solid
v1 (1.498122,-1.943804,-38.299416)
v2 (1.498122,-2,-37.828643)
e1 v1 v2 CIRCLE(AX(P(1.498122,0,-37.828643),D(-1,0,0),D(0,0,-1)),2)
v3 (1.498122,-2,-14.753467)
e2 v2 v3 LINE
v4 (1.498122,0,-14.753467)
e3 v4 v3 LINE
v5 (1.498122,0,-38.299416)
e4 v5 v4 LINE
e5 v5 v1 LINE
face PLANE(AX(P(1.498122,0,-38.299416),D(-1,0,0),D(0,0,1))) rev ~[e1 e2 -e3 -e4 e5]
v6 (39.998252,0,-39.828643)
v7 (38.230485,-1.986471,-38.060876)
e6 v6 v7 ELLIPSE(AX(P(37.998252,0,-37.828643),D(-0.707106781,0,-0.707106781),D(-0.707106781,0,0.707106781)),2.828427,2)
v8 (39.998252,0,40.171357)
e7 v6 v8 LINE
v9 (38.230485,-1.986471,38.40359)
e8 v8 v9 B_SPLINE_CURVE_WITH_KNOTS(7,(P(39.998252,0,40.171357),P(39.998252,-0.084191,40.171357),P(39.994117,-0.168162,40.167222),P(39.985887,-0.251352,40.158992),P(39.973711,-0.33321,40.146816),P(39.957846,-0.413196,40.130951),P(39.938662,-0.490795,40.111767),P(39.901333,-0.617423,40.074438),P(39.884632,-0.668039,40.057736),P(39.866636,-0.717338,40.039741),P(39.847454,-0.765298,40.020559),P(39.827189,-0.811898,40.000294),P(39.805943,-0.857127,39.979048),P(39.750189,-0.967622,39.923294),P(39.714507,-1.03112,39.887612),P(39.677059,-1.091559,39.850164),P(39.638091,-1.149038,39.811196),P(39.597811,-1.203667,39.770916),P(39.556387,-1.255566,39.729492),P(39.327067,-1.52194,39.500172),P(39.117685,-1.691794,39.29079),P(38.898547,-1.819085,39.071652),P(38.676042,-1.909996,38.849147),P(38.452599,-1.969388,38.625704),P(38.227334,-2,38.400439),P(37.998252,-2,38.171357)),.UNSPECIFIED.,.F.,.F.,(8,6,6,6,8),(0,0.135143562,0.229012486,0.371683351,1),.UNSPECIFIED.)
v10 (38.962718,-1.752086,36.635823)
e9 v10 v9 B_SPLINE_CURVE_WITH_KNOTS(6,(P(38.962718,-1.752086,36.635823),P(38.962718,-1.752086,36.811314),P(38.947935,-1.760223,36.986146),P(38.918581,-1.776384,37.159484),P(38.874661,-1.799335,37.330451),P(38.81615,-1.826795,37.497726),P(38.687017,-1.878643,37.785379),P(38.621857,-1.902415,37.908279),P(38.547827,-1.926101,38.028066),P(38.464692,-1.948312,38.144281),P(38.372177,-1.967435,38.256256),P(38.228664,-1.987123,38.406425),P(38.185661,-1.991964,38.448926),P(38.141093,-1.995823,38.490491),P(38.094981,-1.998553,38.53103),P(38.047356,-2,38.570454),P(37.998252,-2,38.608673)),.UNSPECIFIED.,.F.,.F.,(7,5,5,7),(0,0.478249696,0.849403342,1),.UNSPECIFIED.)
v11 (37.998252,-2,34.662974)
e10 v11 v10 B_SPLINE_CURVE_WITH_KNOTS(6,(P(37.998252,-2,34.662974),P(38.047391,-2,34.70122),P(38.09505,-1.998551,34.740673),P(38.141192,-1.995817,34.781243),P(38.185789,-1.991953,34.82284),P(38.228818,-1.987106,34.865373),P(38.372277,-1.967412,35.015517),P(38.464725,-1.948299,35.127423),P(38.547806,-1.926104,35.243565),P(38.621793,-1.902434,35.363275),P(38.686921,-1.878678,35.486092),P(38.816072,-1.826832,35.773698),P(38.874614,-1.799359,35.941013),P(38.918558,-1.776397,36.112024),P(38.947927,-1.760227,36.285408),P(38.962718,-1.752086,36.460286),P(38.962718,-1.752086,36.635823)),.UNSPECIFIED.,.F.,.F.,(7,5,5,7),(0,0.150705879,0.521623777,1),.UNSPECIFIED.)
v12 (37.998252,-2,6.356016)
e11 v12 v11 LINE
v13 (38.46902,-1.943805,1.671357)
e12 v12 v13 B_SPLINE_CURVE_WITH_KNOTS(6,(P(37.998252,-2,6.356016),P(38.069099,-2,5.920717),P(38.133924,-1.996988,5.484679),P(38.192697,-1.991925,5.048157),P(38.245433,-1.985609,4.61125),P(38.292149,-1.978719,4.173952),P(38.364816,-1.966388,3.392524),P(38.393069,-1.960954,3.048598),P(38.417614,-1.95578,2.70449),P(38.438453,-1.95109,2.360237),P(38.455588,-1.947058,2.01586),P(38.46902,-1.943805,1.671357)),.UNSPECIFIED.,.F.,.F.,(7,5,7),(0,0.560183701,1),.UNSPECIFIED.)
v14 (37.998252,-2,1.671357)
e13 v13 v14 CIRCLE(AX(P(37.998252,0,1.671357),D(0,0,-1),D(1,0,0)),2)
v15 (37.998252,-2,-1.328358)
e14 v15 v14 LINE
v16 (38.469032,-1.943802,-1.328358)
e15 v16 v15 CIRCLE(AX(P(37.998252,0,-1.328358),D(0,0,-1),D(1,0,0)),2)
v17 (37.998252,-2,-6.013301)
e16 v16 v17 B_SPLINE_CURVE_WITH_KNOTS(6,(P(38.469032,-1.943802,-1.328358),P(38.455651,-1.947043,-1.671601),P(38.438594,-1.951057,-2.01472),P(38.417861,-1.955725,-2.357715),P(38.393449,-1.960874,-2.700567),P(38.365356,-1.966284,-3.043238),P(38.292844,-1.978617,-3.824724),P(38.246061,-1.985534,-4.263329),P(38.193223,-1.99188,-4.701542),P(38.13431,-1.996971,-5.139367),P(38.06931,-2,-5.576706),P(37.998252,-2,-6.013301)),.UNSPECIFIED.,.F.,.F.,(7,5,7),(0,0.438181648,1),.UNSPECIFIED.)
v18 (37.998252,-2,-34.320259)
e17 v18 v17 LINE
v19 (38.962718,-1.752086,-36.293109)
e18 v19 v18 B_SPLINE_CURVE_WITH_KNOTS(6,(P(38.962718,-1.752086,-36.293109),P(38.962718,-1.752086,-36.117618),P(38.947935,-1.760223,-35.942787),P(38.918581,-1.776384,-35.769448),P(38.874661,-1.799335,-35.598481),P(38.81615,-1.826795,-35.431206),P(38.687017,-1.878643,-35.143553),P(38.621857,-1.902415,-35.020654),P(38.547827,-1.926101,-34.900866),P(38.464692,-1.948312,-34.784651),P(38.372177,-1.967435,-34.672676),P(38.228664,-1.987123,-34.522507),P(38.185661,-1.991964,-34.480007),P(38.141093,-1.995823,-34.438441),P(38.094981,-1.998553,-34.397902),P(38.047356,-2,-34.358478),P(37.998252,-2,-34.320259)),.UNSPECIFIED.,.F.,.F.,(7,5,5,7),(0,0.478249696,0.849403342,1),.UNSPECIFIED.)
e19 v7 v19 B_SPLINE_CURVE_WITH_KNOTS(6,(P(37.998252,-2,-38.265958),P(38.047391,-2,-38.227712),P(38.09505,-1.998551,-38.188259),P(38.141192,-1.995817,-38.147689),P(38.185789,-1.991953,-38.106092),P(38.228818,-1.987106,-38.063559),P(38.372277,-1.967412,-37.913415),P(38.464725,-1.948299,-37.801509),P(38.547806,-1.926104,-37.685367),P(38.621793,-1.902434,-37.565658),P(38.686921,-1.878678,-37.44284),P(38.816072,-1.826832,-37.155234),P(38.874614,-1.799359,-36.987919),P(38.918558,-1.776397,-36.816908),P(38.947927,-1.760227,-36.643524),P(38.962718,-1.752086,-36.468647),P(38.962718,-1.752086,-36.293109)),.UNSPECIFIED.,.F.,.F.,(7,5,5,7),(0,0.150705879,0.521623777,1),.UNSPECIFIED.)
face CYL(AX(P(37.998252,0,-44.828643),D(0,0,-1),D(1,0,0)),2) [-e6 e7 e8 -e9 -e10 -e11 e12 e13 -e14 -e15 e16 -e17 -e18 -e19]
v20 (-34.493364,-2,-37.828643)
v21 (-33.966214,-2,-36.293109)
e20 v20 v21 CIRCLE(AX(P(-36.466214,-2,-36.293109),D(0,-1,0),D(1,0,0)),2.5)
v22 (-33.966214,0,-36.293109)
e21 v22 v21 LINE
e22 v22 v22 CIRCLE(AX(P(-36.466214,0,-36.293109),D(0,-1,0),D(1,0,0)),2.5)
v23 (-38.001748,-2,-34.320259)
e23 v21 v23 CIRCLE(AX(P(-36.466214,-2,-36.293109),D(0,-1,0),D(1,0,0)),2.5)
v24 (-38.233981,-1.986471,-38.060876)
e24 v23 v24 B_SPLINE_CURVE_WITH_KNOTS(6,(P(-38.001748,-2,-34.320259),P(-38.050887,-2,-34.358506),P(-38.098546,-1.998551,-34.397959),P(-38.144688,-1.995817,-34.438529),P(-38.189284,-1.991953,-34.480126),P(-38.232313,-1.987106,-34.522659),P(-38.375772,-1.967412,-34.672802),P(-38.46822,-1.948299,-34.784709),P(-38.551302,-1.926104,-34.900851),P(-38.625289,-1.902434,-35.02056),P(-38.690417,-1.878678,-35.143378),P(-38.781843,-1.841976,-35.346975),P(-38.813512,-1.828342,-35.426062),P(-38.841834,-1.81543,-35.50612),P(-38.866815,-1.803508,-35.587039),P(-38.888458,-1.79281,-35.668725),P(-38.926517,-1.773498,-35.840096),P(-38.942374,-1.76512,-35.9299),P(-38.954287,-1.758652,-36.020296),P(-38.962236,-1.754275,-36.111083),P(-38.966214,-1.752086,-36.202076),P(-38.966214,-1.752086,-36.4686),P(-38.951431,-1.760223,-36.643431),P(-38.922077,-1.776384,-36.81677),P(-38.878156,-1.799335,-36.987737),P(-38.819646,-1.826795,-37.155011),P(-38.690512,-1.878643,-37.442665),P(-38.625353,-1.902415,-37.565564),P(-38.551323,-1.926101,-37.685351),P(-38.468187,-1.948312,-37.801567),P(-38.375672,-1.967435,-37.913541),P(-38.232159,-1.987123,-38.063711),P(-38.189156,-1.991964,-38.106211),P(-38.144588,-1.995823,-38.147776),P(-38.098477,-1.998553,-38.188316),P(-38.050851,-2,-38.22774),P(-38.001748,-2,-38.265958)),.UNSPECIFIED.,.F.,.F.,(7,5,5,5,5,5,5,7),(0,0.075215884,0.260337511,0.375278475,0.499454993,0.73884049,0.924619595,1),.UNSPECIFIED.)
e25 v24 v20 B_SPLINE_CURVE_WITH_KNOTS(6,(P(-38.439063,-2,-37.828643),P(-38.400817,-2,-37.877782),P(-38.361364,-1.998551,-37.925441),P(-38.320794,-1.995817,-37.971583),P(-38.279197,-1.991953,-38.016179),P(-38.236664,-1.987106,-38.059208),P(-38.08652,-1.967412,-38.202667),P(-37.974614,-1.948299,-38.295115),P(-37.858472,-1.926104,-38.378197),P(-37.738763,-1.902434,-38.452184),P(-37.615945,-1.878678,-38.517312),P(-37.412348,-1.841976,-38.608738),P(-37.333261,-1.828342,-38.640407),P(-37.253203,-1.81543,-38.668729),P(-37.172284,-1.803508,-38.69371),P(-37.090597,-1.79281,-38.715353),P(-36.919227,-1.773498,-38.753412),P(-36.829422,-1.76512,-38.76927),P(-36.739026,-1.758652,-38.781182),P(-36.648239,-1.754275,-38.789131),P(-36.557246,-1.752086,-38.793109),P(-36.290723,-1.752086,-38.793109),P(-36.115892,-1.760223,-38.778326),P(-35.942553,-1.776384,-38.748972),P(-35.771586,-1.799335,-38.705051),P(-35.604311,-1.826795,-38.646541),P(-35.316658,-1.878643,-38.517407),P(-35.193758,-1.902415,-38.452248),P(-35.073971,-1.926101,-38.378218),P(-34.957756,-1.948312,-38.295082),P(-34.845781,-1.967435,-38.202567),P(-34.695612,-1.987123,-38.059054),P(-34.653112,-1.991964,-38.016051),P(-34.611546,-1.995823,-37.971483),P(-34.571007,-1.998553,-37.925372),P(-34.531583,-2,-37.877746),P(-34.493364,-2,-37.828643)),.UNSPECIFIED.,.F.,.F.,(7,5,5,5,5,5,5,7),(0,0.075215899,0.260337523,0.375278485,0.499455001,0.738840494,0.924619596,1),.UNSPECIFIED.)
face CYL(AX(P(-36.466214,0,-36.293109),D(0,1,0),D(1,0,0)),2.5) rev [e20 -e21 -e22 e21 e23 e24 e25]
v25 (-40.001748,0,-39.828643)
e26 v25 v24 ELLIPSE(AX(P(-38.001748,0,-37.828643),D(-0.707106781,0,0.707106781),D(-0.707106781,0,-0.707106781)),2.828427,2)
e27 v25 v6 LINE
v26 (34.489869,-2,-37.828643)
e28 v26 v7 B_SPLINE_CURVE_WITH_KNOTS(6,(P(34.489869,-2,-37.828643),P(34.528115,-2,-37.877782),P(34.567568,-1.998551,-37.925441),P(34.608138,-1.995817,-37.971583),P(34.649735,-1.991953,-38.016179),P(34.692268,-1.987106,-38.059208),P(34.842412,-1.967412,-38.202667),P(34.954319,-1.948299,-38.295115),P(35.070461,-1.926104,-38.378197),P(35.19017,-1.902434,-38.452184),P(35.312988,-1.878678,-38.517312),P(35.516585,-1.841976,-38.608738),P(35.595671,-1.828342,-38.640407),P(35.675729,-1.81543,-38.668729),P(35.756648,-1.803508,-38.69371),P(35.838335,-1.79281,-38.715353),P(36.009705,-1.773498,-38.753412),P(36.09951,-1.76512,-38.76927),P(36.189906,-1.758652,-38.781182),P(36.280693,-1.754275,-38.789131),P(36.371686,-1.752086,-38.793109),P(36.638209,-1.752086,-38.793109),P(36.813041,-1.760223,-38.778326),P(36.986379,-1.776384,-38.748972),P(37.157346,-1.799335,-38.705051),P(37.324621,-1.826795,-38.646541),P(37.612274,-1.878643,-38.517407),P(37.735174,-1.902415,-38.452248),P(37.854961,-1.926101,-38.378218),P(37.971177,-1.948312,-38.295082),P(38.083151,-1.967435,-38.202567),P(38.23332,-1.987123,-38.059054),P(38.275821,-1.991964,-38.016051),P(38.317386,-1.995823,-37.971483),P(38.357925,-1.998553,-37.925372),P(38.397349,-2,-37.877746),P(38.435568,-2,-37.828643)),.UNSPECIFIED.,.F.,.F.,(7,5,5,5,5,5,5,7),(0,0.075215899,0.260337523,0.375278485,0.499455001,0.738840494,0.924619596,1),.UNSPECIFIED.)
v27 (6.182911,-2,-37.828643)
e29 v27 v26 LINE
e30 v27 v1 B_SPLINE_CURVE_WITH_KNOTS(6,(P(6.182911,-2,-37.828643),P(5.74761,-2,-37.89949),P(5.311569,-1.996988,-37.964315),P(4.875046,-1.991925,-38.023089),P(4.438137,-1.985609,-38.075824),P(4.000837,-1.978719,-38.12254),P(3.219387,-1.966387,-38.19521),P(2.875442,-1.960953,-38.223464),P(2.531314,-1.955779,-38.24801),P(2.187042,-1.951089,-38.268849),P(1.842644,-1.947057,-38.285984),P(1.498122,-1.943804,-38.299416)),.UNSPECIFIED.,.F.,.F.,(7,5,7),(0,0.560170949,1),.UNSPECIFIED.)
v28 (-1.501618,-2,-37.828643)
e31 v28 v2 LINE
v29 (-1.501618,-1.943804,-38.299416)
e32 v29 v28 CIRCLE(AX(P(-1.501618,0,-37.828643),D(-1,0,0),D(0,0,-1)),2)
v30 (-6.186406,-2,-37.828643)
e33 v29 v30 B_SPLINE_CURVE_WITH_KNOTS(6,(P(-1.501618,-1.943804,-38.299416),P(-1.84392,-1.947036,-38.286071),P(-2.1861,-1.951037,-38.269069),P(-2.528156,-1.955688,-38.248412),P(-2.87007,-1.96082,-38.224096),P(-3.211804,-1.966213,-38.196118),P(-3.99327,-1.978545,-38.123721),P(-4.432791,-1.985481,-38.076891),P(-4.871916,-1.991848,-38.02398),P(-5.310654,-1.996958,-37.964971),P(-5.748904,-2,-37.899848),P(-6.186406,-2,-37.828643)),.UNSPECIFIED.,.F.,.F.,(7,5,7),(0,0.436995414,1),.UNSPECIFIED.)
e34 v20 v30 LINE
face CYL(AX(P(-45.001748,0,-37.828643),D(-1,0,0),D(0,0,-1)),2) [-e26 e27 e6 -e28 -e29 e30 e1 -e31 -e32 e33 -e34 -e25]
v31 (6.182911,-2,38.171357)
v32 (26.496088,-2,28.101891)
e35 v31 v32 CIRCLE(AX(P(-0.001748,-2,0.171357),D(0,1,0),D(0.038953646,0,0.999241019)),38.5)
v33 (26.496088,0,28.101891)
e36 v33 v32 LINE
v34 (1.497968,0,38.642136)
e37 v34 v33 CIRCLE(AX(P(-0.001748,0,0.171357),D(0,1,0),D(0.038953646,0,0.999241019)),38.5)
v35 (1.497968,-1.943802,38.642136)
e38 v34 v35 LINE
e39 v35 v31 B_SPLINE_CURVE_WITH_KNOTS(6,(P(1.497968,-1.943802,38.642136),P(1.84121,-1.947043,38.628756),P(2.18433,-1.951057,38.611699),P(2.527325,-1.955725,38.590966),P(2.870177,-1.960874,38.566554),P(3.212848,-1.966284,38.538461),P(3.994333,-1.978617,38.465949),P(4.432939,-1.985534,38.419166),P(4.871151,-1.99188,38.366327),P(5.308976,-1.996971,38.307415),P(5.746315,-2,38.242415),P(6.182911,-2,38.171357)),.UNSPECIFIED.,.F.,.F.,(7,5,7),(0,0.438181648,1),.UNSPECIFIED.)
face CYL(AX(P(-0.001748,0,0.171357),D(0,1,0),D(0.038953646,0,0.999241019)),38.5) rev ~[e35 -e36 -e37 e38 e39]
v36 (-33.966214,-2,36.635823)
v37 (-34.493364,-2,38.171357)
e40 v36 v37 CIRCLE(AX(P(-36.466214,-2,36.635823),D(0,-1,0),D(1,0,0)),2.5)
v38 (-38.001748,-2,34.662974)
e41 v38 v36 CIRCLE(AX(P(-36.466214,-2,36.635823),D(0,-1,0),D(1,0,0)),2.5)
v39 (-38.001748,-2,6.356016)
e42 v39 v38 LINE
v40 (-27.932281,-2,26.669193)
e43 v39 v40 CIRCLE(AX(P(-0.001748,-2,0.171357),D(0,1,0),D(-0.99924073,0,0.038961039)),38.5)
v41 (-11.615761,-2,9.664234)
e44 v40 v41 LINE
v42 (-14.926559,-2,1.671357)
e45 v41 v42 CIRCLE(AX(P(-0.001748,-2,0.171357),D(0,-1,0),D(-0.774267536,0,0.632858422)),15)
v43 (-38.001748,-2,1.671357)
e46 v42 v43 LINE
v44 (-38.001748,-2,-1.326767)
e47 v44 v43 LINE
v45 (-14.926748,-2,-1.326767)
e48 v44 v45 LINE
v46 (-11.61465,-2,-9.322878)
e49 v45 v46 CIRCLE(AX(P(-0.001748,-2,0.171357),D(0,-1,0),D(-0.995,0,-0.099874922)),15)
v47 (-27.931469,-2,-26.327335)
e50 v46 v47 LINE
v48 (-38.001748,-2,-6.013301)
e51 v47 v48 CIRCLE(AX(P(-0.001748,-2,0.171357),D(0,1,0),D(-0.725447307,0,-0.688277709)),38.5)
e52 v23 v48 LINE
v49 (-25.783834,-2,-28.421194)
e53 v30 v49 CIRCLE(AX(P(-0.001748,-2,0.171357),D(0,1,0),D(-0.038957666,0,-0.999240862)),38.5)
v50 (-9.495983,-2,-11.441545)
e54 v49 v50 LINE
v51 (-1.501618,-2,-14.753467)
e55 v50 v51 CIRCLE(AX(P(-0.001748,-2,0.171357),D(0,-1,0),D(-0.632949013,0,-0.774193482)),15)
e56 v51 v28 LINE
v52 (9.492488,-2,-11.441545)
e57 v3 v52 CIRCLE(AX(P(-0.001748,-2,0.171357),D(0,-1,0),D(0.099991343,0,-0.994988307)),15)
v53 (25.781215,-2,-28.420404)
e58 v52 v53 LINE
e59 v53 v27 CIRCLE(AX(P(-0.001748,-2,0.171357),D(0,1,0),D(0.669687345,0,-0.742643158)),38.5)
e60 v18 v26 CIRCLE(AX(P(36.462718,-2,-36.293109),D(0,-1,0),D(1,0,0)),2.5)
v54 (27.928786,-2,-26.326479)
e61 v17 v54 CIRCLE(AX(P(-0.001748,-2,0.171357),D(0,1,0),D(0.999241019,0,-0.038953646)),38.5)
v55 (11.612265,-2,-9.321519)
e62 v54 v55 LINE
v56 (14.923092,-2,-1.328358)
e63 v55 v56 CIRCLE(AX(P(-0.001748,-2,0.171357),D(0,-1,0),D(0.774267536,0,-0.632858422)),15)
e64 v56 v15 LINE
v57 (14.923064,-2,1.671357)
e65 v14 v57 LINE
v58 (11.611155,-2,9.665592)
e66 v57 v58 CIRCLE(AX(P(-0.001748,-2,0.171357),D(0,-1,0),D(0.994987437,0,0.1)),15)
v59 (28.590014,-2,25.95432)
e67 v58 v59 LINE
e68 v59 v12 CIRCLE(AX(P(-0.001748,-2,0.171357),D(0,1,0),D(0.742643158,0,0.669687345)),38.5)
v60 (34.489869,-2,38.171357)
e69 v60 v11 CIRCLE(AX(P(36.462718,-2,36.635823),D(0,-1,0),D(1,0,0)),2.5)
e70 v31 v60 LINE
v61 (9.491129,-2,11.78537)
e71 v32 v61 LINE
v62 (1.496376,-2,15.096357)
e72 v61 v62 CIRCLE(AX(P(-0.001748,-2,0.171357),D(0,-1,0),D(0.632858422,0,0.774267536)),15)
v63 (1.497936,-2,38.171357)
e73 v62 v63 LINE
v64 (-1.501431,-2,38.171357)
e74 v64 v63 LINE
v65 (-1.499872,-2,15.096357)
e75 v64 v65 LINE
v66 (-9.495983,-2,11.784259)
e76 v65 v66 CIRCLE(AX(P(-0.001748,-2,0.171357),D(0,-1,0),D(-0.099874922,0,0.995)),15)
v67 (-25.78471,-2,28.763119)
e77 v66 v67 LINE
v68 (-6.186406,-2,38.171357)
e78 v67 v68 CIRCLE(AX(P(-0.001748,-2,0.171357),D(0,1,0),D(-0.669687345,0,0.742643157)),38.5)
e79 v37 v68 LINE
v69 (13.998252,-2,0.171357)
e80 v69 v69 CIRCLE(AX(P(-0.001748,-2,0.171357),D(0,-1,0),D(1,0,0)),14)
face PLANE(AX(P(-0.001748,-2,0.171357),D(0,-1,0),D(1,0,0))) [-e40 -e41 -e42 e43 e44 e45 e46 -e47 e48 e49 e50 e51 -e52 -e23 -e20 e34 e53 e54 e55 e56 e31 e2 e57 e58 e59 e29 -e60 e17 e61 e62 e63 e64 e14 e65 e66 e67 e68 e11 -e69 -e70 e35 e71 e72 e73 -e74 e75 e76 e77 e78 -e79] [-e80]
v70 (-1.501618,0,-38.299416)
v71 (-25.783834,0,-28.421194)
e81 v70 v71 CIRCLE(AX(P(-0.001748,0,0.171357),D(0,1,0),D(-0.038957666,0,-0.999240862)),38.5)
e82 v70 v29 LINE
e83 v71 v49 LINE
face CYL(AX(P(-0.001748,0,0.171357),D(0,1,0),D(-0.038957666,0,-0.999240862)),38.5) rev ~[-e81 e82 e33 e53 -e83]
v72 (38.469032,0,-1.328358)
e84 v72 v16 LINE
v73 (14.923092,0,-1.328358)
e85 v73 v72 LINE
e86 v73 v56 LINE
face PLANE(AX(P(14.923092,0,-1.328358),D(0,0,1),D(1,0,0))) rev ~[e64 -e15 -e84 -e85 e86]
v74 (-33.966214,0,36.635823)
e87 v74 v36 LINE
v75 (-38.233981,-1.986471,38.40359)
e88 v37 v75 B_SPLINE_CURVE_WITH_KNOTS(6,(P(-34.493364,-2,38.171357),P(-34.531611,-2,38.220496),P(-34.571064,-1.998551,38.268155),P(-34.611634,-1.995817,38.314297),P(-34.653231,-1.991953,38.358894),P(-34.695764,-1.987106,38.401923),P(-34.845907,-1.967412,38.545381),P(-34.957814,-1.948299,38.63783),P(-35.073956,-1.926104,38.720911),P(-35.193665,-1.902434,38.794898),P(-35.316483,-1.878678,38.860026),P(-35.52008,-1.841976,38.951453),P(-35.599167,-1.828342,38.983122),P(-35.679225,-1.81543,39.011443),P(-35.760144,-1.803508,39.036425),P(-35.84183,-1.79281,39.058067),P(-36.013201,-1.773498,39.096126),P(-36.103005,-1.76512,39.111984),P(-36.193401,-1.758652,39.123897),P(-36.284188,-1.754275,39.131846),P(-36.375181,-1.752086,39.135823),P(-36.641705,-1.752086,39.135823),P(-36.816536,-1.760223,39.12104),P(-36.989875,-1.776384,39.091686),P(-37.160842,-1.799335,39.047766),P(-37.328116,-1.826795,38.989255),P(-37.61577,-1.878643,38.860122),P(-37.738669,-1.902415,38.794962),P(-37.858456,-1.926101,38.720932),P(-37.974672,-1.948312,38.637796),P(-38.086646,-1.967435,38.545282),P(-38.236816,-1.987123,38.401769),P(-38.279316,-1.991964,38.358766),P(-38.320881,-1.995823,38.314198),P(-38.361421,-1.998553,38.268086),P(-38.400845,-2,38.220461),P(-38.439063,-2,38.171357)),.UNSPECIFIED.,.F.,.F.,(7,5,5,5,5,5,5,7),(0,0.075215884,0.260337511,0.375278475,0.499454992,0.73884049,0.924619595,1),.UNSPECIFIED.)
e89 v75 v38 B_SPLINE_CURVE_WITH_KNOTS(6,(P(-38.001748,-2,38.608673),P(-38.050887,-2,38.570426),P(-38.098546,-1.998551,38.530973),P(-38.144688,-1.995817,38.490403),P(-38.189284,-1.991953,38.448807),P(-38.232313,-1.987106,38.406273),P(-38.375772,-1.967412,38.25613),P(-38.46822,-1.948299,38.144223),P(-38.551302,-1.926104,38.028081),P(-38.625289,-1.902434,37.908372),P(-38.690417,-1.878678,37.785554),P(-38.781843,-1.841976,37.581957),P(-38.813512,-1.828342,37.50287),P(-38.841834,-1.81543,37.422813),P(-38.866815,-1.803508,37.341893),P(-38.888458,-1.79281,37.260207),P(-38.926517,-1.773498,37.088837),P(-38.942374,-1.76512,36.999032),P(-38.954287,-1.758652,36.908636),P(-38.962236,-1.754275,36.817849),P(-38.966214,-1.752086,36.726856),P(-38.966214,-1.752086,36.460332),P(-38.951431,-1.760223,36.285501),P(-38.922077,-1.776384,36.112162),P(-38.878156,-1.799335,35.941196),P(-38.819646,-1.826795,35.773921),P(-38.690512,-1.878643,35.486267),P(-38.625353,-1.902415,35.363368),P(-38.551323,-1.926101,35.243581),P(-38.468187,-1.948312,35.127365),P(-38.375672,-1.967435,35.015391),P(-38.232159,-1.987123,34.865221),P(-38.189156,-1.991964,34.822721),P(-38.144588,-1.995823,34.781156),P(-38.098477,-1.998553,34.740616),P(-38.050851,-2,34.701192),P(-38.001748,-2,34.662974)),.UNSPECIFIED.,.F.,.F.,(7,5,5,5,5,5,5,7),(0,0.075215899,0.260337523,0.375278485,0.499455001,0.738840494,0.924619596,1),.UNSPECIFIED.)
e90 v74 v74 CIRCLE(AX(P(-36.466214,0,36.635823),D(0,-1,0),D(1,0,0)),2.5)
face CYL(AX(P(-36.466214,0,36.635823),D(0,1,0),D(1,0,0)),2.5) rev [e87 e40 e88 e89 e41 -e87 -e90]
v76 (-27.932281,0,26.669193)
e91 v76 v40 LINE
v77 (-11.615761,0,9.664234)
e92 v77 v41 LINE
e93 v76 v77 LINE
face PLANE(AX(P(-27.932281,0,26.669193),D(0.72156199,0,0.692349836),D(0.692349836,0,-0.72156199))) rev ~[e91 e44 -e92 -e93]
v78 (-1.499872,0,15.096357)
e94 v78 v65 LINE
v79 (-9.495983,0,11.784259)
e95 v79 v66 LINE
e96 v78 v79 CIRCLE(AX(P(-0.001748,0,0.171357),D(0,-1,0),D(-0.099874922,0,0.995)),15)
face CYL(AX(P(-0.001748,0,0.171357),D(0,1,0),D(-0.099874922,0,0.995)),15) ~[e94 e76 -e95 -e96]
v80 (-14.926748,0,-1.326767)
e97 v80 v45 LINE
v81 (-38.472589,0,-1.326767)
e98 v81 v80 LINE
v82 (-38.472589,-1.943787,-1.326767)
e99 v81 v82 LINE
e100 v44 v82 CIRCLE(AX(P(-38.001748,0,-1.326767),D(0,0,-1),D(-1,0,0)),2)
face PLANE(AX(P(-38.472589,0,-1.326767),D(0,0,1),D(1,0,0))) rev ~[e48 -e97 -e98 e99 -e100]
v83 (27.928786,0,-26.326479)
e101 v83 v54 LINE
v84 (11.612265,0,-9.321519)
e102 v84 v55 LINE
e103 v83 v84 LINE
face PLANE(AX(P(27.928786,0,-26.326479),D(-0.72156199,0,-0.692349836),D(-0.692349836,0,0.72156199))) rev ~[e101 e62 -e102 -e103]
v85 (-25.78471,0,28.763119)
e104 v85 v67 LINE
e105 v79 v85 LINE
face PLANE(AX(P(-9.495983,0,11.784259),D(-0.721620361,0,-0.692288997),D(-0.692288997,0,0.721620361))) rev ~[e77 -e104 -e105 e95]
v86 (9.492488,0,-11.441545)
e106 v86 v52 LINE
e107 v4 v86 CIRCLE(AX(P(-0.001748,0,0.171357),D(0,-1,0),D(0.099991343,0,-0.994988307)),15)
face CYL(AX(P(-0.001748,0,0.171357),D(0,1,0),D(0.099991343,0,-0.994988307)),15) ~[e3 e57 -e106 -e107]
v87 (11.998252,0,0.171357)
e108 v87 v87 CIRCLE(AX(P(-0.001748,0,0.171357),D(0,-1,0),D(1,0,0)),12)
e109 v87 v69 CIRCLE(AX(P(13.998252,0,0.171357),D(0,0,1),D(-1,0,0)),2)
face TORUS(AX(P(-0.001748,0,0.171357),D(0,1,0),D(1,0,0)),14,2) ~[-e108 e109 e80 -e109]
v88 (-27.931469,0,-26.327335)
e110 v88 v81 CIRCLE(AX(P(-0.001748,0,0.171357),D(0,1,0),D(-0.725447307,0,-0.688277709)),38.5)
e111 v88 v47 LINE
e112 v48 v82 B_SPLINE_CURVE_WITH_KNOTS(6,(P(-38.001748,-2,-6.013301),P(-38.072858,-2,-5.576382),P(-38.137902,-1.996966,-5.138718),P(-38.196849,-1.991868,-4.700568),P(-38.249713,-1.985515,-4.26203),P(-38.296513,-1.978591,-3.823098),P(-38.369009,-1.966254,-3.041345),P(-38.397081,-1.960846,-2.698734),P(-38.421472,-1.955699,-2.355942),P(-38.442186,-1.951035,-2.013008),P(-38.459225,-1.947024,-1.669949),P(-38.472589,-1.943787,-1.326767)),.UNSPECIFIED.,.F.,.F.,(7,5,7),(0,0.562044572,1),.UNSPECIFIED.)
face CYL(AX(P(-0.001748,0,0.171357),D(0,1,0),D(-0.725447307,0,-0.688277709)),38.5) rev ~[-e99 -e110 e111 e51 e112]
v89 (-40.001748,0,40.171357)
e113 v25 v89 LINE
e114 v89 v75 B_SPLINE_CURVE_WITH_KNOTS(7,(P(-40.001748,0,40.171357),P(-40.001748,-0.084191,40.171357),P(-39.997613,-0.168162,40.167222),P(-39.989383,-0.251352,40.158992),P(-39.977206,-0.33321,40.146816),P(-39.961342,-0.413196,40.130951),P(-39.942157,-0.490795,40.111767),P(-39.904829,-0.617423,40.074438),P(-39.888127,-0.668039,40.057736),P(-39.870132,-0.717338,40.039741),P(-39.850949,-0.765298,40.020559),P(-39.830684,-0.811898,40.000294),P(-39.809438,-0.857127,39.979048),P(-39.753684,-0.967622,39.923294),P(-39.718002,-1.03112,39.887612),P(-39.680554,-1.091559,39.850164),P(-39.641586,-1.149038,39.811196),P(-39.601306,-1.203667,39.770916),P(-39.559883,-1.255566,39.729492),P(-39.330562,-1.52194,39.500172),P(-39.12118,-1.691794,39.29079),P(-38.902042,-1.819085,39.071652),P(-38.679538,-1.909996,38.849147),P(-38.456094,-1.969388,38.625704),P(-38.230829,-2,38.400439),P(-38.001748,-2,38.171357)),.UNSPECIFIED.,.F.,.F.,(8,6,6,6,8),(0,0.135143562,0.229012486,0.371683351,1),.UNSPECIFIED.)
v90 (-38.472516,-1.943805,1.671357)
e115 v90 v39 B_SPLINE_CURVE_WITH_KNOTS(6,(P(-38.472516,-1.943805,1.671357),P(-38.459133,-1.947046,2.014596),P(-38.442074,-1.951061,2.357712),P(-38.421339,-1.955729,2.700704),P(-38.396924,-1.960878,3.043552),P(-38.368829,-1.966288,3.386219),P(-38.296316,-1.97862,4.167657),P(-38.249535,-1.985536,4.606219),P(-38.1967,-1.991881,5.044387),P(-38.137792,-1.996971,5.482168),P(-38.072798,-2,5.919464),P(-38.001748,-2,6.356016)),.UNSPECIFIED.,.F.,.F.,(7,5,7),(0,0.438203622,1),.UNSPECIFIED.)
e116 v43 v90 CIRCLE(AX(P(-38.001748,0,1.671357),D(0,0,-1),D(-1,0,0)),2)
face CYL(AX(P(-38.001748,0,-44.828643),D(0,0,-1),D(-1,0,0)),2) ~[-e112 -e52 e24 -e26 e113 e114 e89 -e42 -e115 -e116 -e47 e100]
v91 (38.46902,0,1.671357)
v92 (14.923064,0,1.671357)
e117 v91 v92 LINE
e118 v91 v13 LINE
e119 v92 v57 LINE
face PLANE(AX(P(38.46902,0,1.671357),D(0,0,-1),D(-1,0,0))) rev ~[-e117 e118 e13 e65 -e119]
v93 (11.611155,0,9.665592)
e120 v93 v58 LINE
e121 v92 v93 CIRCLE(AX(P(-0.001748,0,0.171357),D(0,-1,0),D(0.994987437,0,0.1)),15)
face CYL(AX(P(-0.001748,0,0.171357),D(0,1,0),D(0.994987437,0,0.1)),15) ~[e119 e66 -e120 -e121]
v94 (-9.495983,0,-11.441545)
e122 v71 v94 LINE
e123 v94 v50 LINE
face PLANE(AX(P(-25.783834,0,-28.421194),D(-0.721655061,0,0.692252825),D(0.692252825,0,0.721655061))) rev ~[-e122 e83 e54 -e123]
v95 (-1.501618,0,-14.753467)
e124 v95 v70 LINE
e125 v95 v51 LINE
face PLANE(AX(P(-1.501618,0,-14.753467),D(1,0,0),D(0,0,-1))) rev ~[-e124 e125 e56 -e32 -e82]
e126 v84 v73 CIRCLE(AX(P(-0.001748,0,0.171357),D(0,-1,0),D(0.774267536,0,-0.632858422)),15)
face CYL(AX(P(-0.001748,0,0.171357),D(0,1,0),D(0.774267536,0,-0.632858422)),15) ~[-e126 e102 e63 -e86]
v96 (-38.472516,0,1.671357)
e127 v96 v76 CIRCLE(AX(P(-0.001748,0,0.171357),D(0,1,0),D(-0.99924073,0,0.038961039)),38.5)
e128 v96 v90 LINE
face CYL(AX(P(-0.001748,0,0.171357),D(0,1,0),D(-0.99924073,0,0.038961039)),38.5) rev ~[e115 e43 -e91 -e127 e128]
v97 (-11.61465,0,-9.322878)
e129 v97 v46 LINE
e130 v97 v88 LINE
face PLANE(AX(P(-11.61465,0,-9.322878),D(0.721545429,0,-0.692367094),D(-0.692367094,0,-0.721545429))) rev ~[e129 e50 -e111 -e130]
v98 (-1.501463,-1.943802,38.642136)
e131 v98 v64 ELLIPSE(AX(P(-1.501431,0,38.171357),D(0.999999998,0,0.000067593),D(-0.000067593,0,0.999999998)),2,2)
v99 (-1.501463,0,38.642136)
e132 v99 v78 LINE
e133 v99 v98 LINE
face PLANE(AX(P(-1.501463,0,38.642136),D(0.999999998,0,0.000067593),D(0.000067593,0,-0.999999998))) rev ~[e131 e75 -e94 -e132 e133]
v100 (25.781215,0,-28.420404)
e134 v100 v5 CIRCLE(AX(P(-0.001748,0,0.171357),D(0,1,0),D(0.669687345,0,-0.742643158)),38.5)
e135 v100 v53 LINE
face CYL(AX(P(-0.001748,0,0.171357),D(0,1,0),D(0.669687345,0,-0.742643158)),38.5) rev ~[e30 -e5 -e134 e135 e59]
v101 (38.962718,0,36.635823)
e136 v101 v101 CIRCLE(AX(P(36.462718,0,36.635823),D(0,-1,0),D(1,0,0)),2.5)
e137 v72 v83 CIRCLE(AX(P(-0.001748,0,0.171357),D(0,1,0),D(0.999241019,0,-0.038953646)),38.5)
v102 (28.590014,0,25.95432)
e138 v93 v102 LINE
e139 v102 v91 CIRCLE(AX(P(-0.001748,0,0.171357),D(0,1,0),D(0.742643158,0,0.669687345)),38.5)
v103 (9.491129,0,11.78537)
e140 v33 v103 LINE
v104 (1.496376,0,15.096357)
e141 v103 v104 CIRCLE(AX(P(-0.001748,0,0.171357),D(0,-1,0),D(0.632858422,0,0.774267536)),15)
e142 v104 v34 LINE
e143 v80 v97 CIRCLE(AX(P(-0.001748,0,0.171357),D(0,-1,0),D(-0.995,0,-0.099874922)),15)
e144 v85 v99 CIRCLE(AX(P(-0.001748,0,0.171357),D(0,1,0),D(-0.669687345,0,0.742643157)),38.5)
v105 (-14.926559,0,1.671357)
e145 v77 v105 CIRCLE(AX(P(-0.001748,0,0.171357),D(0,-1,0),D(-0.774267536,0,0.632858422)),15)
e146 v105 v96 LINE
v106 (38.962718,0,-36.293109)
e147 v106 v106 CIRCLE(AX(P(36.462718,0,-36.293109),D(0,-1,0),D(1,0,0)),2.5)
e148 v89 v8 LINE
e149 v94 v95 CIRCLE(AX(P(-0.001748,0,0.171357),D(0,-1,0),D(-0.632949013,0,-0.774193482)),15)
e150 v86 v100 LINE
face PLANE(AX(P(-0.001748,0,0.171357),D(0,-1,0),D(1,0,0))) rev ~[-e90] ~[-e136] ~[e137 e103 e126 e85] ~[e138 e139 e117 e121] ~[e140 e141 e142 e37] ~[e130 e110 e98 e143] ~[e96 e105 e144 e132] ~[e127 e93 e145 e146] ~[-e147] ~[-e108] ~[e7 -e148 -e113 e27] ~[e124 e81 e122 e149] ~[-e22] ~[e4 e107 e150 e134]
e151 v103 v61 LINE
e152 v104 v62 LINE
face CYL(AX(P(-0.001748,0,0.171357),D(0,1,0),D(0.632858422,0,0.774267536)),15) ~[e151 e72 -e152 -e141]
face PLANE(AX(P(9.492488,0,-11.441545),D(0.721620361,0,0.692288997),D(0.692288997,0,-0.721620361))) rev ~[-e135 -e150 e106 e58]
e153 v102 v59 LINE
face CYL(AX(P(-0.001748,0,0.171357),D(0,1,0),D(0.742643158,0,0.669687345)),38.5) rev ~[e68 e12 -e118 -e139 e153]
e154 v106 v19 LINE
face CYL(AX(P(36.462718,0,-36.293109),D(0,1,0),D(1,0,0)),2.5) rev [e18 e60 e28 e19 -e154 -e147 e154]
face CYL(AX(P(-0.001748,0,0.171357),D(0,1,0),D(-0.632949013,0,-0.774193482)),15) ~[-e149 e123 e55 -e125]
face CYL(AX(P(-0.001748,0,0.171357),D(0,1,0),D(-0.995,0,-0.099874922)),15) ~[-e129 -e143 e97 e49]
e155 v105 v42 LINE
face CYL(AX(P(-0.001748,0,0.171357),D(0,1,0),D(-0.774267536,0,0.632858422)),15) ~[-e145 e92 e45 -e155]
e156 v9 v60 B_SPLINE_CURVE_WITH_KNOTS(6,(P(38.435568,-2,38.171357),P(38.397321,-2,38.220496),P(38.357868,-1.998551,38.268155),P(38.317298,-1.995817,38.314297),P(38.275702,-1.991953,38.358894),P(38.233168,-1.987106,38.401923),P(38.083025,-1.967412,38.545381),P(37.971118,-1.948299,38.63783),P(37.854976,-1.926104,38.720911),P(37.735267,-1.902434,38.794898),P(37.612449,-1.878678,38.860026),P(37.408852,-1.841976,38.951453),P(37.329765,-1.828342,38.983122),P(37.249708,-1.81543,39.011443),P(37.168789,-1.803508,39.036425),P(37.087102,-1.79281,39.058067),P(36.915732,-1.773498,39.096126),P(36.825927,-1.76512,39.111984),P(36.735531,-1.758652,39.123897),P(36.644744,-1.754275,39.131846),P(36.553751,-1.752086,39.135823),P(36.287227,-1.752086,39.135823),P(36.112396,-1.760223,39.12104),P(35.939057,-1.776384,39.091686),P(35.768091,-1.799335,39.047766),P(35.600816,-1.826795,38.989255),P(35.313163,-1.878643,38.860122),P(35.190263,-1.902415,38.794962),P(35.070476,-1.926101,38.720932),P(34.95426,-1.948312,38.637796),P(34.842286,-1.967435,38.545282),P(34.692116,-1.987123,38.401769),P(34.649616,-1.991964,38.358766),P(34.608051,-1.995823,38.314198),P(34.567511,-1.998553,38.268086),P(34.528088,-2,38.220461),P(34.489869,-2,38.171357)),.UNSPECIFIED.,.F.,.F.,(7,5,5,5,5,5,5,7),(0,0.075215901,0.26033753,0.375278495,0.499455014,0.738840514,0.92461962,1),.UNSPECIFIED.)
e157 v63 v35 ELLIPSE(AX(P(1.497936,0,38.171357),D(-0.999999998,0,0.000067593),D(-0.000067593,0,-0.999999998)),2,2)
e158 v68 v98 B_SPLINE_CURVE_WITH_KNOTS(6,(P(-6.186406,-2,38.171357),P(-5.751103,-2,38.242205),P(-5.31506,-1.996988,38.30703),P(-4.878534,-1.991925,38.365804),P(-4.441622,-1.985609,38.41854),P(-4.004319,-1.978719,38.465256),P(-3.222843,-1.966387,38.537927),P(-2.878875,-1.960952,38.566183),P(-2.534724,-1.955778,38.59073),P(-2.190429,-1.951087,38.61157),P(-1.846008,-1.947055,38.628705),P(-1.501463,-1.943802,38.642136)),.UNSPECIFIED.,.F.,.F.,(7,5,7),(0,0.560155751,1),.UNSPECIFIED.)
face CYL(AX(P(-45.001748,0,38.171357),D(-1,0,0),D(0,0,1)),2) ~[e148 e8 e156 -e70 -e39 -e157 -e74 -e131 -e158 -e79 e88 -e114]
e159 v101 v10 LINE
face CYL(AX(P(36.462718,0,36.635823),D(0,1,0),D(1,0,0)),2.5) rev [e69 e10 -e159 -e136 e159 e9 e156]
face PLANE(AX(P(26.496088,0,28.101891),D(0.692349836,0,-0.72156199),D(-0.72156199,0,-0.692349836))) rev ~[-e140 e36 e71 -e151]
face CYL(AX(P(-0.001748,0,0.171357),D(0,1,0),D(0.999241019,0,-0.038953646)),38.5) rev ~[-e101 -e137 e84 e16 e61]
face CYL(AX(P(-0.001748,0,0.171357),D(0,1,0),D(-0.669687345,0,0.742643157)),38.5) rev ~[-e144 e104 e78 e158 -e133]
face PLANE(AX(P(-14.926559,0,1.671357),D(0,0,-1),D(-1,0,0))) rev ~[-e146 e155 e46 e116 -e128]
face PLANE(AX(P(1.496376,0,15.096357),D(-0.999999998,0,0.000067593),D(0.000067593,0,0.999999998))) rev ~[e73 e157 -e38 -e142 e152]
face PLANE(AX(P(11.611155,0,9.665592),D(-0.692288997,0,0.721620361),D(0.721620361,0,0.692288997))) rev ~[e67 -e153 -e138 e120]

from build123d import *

# Parameters (mm, degrees)
F0_W        = 80
F0_H        = 80
F0_R        = 2.5
F0_R_2      = 12
F1_DEPTH    = 2
F2_T1_DEPTH = 90
F2_T3_DEPTH = 90


# Not quite as in the source:
# - a fillet or chamfer that OpenCascade refuses, or shapes differently, is made with other operations: its cross-section is extruded or revolved along the edge and cut away or added


with BuildPart() as f1:
    # F0 (on Front) → F1 (new body)
    with BuildSketch(Plane.XZ):
        with Locations((-0.0017476827, 0.1713572443)):
            Rectangle(F0_W, F0_H)
        with Locations((-36.4662137768, -36.2931088498)):
            Circle(F0_R, mode=Mode.SUBTRACT)
        with Locations((36.4627184114, -36.2931088498)):
            Circle(F0_R, mode=Mode.SUBTRACT)
        with Locations((-36.4662137768, 36.6358233383)):
            Circle(F0_R, mode=Mode.SUBTRACT)
        with BuildLine():
            ThreePointArc((38.4690204407, 1.6713572443), (38.4909436544, 0.9214996478), (38.4982523173, 0.1713572443))
            ThreePointArc((38.4982523173, 0.1713572443), (38.4909464293, -0.5786427557), (38.4690315381, -1.3283581108))
            ThreePointArc((38.4690315381, -1.3283581108), (35.4737380316, -14.7865808935), (27.9287857338, -26.3264785744))
            ThreePointArc((27.9287857338, -26.3264785744), (26.8753996766, -27.3943633128), (25.7812151161, -28.4204043195))
            ThreePointArc((25.7812151161, -28.4204043195), (14.5064210867, -35.4904295724), (1.498122464, -38.2994159419))
            ThreePointArc((1.498122464, -38.2994159419), (0.7484071972, -38.3213338497), (-0.0015927734, -38.3286427554))
            ThreePointArc((-0.0015927734, -38.3286427554), (-0.7517476827, -38.3213368677), (-1.5016178294, -38.2994159419))
            ThreePointArc((-1.5016178294, -38.2994159419), (-14.5093699729, -35.4906518899), (-25.7838341949, -28.421194497))
            ThreePointArc((-25.7838341949, -28.421194497), (-26.8780502008, -27.3951870251), (-27.9314689858, -26.3273345712))
            ThreePointArc((-27.9314689858, -26.3273345712), (-35.4773135858, -14.7863907098), (-38.4725889134, -1.3267665824))
            ThreePointArc((-38.4725889134, -1.3267665824), (-38.4944573001, -0.5778465387), (-38.5017476827, 0.1713572443))
            ThreePointArc((-38.5017476827, 0.1713572443), (-38.4944390198, 0.9214996478), (-38.472515806, 1.6713572443))
            ThreePointArc((-38.472515806, 1.6713572443), (-35.4771780599, 15.1294266234), (-27.9322810992, 26.6691930629))
            ThreePointArc((-27.9322810992, 26.6691930629), (-26.878895042, 27.7370778013), (-25.7847104814, 28.763118808))
            ThreePointArc((-25.7847104814, 28.763118808), (-14.5098447074, 35.8331732485), (-1.5014630377, 38.642136465))
            ThreePointArc((-1.5014630377, 38.642136465), (-0.7517476827, 38.6640513563), (-0.0017476827, 38.6713572443))
            ThreePointArc((-0.0017476827, 38.6713572443), (0.7482523173, 38.6640513563), (1.4979676723, 38.642136465))
            ThreePointArc((1.4979676723, 38.642136465), (14.9561904551, 35.6468429586), (26.4960881359, 28.1018906607))
            ThreePointArc((26.4960881359, 28.1018906607), (27.5639728743, 27.0485046035), (28.5900138811, 25.954320043))
            ThreePointArc((28.5900138811, 25.954320043), (35.6600146487, 14.6795861996), (38.4690204407, 1.6713572443))
        make_face(mode=Mode.SUBTRACT)
        with Locations((36.4627184114, 36.6358233383)):
            Circle(F0_R, mode=Mode.SUBTRACT)
        with BuildLine():
            Line((-9.495982875, 11.7842594703), (-25.7847104814, 28.763118808))
            ThreePointArc((-25.7847104814, 28.763118808), (-26.878895042, 27.7370778013), (-27.9322810992, 26.6691930629))
            Line((-27.9322810992, 26.6691930629), (-11.6157607218, 9.6642335801))
            ThreePointArc((-11.6157607218, 9.6642335801), (-10.608969906, 10.7773384203), (-9.495982875, 11.7842594703))
        make_face()
        with BuildLine():
            ThreePointArc((14.9230924791, -1.3283581108), (14.9794505742, -0.5794415216), (14.9982523173, 0.1713572443))
            ThreePointArc((14.9982523173, 0.1713572443), (14.979443414, 0.9222988702), (14.9230638739, 1.6713572443))
            ThreePointArc((14.9230638739, 1.6713572443), (13.8560844811, 5.9124797581), (11.6111545434, 9.6655924366))
            ThreePointArc((11.6111545434, 9.6655924366), (10.6042334933, 10.7785794675), (9.4911286531, 11.7853702834))
            ThreePointArc((9.4911286531, 11.7853702834), (5.7376930398, 14.0298860332), (1.496376144, 15.0963572443))
            ThreePointArc((1.496376144, 15.0963572443), (0.7482523173, 15.1525955108), (-0.0017476827, 15.1713572443))
            ThreePointArc((-0.0017476827, 15.1713572443), (-0.7517476827, 15.1525955108), (-1.4998715093, 15.0963572443))
            ThreePointArc((-1.4998715093, 15.0963572443), (-5.7419991682, 14.0295502319), (-9.495982875, 11.7842594703))
            ThreePointArc((-9.495982875, 11.7842594703), (-10.608969906, 10.7773384203), (-11.6157607218, 9.6642335801))
            ThreePointArc((-11.6157607218, 9.6642335801), (-13.8599156987, 5.9116690162), (-14.9265592393, 1.6713572443))
            ThreePointArc((-14.9265592393, 1.6713572443), (-14.9829387793, 0.9222988702), (-15.0017476827, 0.1713572443))
            ThreePointArc((-15.0017476827, 0.1713572443), (-14.9829859493, -0.5786427557), (-14.9267476827, -1.3267665824))
            ThreePointArc((-14.9267476827, -1.3267665824), (-13.8599406704, -5.5688942412), (-11.6146499088, -9.3228779481))
            ThreePointArc((-11.6146499088, -9.3228779481), (-10.6083494005, -10.4352444735), (-9.495982875, -11.4415449818))
            ThreePointArc((-9.495982875, -11.4415449818), (-5.7428099115, -13.6864998947), (-1.5016178294, -14.7534673625))
            ThreePointArc((-1.5016178294, -14.7534673625), (-0.7525467792, -14.8098409961), (-0.0015927734, -14.8286427549))
            ThreePointArc((-0.0015927734, -14.8286427549), (0.7492061289, -14.8098332416), (1.498122464, -14.7534673625))
            ThreePointArc((1.498122464, -14.7534673625), (5.7393145462, -13.6864998947), (9.4924875096, -11.4415449818))
            ThreePointArc((9.4924875096, -11.4415449818), (10.6054745406, -10.4346239318), (11.6122653564, -9.3215190916))
            ThreePointArc((11.6122653564, -9.3215190916), (13.8564750721, -5.5688223766), (14.9230924791, -1.3283581108))
        make_face()
        with Locations((-0.0017476827, 0.1713572443)):
            Circle(F0_R_2, mode=Mode.SUBTRACT)
        with BuildLine():
            Line((-0.0017476827, 15.1713572443), (-0.0017476827, 38.6713572443))
            ThreePointArc((-0.0017476827, 38.6713572443), (-0.7517476827, 38.6640513563), (-1.5014630377, 38.642136465))
            Line((-1.5014630377, 38.642136465), (-1.4998715093, 15.0963572443))
            ThreePointArc((-1.4998715093, 15.0963572443), (-0.7517476827, 15.1525955108), (-0.0017476827, 15.1713572443))
        make_face()
        with BuildLine():
            Line((1.496376144, 15.0963572443), (1.4979676723, 38.642136465))
            ThreePointArc((1.4979676723, 38.642136465), (0.7482523173, 38.6640513563), (-0.0017476827, 38.6713572443))
            Line((-0.0017476827, 38.6713572443), (-0.0017476827, 15.1713572443))
            ThreePointArc((-0.0017476827, 15.1713572443), (0.7482523173, 15.1525955108), (1.496376144, 15.0963572443))
        make_face()
        with BuildLine():
            Line((11.6111545434, 9.6655924366), (28.5900138811, 25.954320043))
            ThreePointArc((28.5900138811, 25.954320043), (27.5639728743, 27.0485046035), (26.4960881359, 28.1018906607))
            Line((26.4960881359, 28.1018906607), (9.4911286531, 11.7853702834))
            ThreePointArc((9.4911286531, 11.7853702834), (10.6042334933, 10.7785794675), (11.6111545434, 9.6655924366))
        make_face()
        with BuildLine():
            Line((14.9982523173, 0.1713572443), (38.4982523173, 0.1713572443))
            ThreePointArc((38.4982523173, 0.1713572443), (38.4909436544, 0.9214996478), (38.4690204407, 1.6713572443))
            Line((38.4690204407, 1.6713572443), (14.9230638739, 1.6713572443))
            ThreePointArc((14.9230638739, 1.6713572443), (14.979443414, 0.9222988702), (14.9982523173, 0.1713572443))
        make_face()
        with BuildLine():
            ThreePointArc((38.4690315381, -1.3283581108), (38.4909464293, -0.5786427557), (38.4982523173, 0.1713572443))
            Line((38.4982523173, 0.1713572443), (14.9982523173, 0.1713572443))
            ThreePointArc((14.9982523173, 0.1713572443), (14.9794505742, -0.5794415216), (14.9230924791, -1.3283581108))
            Line((14.9230924791, -1.3283581108), (38.4690315381, -1.3283581108))
        make_face()
        with BuildLine():
            ThreePointArc((25.7812151161, -28.4204043195), (26.8753996766, -27.3943633128), (27.9287857338, -26.3264785744))
            Line((27.9287857338, -26.3264785744), (11.6122653564, -9.3215190916))
            ThreePointArc((11.6122653564, -9.3215190916), (10.6054745406, -10.4346239318), (9.4924875096, -11.4415449818))
            Line((9.4924875096, -11.4415449818), (25.7812151161, -28.4204043195))
        make_face()
        with BuildLine():
            ThreePointArc((-0.0015927734, -38.3286427554), (0.7484071972, -38.3213338497), (1.498122464, -38.2994159419))
            Line((1.498122464, -38.2994159419), (1.498122464, -14.7534673625))
            ThreePointArc((1.498122464, -14.7534673625), (0.7492061289, -14.8098332416), (-0.0015927734, -14.8286427549))
            Line((-0.0015927734, -14.8286427549), (-0.0015927734, -38.3286427554))
        make_face()
        with BuildLine():
            ThreePointArc((-1.5016178294, -38.2994159419), (-0.7517476827, -38.3213368677), (-0.0015927734, -38.3286427554))
            Line((-0.0015927734, -38.3286427554), (-0.0015927734, -14.8286427549))
            ThreePointArc((-0.0015927734, -14.8286427549), (-0.7525467792, -14.8098409961), (-1.5016178294, -14.7534673625))
            Line((-1.5016178294, -14.7534673625), (-1.5016178294, -38.2994159419))
        make_face()
        with BuildLine():
            ThreePointArc((-27.9314689858, -26.3273345712), (-26.8780502008, -27.3951870251), (-25.7838341949, -28.421194497))
            Line((-25.7838341949, -28.421194497), (-9.495982875, -11.4415449818))
            ThreePointArc((-9.495982875, -11.4415449818), (-10.6083494005, -10.4352444735), (-11.6146499088, -9.3228779481))
            Line((-11.6146499088, -9.3228779481), (-27.9314689858, -26.3273345712))
        make_face()
        with BuildLine():
            ThreePointArc((-38.5017476827, 0.1713572443), (-38.4944573001, -0.5778465387), (-38.4725889134, -1.3267665824))
            Line((-38.4725889134, -1.3267665824), (-14.9267476827, -1.3267665824))
            ThreePointArc((-14.9267476827, -1.3267665824), (-14.9829859493, -0.5786427557), (-15.0017476827, 0.1713572443))
            Line((-15.0017476827, 0.1713572443), (-38.5017476827, 0.1713572443))
        make_face()
        with BuildLine():
            Line((-14.9265592393, 1.6713572443), (-38.472515806, 1.6713572443))
            ThreePointArc((-38.472515806, 1.6713572443), (-38.4944390198, 0.9214996478), (-38.5017476827, 0.1713572443))
            Line((-38.5017476827, 0.1713572443), (-15.0017476827, 0.1713572443))
            ThreePointArc((-15.0017476827, 0.1713572443), (-14.9829387793, 0.9222988702), (-14.9265592393, 1.6713572443))
        make_face()
    extrude(amount=F1_DEPTH)

    # F2: fillet of radius 2 on 5 edges, made by hand

    # F2_s2 → F2_t1 (cut)
    with BuildSketch(Plane.YZ.offset(-45.0017476827)):
        with BuildLine():
            ThreePointArc((0, 40.1713572443), (-1.4142135624, 39.5855708066), (-2, 38.1713572443))
            Line((-2, 38.1713572443), (-2, 40.1713572443))
            Line((-2, 40.1713572443), (0, 40.1713572443))
        make_face()
        with BuildLine():
            ThreePointArc((0, -39.8286427557), (-1.4142135624, -39.2428563181), (-2, -37.8286427557))
            Line((-2, -37.8286427557), (-2, -39.8286427557))
            Line((-2, -39.8286427557), (0, -39.8286427557))
        make_face()
    extrude(amount=F2_T1_DEPTH, mode=Mode.SUBTRACT)

    # F2_s4 → F2_t3 (cut)
    with BuildSketch(Plane.XY.offset(-44.8286427557)):
        with BuildLine():
            ThreePointArc((39.9982523173, 0), (39.4124658797, -1.4142135624), (37.9982523173, -2))
            Line((37.9982523173, -2), (39.9982523173, -2))
            Line((39.9982523173, -2), (39.9982523173, 0))
        make_face()
        with BuildLine():
            ThreePointArc((-40.0017476827, 0), (-39.4159612451, -1.4142135624), (-38.0017476827, -2))
            Line((-38.0017476827, -2), (-40.0017476827, -2))
            Line((-40.0017476827, -2), (-40.0017476827, 0))
        make_face()
    extrude(amount=F2_T3_DEPTH, mode=Mode.SUBTRACT)

    # F2_s5 → F2_t6 (revolve, cut)
    with BuildSketch(Plane.XY.offset(0.1713572443)):
        with BuildLine():
            ThreePointArc((11.9982523173, 0), (12.5840387549, -1.4142135624), (13.9982523173, -2))
            Line((13.9982523173, -2), (11.9982523173, -2))
            Line((11.9982523173, -2), (11.9982523173, 0))
        make_face()
    revolve(axis=Axis((-0.0017476827, -2, 0.1713572443), (0, -1, 0)), mode=Mode.SUBTRACT)


solid = f1.part
